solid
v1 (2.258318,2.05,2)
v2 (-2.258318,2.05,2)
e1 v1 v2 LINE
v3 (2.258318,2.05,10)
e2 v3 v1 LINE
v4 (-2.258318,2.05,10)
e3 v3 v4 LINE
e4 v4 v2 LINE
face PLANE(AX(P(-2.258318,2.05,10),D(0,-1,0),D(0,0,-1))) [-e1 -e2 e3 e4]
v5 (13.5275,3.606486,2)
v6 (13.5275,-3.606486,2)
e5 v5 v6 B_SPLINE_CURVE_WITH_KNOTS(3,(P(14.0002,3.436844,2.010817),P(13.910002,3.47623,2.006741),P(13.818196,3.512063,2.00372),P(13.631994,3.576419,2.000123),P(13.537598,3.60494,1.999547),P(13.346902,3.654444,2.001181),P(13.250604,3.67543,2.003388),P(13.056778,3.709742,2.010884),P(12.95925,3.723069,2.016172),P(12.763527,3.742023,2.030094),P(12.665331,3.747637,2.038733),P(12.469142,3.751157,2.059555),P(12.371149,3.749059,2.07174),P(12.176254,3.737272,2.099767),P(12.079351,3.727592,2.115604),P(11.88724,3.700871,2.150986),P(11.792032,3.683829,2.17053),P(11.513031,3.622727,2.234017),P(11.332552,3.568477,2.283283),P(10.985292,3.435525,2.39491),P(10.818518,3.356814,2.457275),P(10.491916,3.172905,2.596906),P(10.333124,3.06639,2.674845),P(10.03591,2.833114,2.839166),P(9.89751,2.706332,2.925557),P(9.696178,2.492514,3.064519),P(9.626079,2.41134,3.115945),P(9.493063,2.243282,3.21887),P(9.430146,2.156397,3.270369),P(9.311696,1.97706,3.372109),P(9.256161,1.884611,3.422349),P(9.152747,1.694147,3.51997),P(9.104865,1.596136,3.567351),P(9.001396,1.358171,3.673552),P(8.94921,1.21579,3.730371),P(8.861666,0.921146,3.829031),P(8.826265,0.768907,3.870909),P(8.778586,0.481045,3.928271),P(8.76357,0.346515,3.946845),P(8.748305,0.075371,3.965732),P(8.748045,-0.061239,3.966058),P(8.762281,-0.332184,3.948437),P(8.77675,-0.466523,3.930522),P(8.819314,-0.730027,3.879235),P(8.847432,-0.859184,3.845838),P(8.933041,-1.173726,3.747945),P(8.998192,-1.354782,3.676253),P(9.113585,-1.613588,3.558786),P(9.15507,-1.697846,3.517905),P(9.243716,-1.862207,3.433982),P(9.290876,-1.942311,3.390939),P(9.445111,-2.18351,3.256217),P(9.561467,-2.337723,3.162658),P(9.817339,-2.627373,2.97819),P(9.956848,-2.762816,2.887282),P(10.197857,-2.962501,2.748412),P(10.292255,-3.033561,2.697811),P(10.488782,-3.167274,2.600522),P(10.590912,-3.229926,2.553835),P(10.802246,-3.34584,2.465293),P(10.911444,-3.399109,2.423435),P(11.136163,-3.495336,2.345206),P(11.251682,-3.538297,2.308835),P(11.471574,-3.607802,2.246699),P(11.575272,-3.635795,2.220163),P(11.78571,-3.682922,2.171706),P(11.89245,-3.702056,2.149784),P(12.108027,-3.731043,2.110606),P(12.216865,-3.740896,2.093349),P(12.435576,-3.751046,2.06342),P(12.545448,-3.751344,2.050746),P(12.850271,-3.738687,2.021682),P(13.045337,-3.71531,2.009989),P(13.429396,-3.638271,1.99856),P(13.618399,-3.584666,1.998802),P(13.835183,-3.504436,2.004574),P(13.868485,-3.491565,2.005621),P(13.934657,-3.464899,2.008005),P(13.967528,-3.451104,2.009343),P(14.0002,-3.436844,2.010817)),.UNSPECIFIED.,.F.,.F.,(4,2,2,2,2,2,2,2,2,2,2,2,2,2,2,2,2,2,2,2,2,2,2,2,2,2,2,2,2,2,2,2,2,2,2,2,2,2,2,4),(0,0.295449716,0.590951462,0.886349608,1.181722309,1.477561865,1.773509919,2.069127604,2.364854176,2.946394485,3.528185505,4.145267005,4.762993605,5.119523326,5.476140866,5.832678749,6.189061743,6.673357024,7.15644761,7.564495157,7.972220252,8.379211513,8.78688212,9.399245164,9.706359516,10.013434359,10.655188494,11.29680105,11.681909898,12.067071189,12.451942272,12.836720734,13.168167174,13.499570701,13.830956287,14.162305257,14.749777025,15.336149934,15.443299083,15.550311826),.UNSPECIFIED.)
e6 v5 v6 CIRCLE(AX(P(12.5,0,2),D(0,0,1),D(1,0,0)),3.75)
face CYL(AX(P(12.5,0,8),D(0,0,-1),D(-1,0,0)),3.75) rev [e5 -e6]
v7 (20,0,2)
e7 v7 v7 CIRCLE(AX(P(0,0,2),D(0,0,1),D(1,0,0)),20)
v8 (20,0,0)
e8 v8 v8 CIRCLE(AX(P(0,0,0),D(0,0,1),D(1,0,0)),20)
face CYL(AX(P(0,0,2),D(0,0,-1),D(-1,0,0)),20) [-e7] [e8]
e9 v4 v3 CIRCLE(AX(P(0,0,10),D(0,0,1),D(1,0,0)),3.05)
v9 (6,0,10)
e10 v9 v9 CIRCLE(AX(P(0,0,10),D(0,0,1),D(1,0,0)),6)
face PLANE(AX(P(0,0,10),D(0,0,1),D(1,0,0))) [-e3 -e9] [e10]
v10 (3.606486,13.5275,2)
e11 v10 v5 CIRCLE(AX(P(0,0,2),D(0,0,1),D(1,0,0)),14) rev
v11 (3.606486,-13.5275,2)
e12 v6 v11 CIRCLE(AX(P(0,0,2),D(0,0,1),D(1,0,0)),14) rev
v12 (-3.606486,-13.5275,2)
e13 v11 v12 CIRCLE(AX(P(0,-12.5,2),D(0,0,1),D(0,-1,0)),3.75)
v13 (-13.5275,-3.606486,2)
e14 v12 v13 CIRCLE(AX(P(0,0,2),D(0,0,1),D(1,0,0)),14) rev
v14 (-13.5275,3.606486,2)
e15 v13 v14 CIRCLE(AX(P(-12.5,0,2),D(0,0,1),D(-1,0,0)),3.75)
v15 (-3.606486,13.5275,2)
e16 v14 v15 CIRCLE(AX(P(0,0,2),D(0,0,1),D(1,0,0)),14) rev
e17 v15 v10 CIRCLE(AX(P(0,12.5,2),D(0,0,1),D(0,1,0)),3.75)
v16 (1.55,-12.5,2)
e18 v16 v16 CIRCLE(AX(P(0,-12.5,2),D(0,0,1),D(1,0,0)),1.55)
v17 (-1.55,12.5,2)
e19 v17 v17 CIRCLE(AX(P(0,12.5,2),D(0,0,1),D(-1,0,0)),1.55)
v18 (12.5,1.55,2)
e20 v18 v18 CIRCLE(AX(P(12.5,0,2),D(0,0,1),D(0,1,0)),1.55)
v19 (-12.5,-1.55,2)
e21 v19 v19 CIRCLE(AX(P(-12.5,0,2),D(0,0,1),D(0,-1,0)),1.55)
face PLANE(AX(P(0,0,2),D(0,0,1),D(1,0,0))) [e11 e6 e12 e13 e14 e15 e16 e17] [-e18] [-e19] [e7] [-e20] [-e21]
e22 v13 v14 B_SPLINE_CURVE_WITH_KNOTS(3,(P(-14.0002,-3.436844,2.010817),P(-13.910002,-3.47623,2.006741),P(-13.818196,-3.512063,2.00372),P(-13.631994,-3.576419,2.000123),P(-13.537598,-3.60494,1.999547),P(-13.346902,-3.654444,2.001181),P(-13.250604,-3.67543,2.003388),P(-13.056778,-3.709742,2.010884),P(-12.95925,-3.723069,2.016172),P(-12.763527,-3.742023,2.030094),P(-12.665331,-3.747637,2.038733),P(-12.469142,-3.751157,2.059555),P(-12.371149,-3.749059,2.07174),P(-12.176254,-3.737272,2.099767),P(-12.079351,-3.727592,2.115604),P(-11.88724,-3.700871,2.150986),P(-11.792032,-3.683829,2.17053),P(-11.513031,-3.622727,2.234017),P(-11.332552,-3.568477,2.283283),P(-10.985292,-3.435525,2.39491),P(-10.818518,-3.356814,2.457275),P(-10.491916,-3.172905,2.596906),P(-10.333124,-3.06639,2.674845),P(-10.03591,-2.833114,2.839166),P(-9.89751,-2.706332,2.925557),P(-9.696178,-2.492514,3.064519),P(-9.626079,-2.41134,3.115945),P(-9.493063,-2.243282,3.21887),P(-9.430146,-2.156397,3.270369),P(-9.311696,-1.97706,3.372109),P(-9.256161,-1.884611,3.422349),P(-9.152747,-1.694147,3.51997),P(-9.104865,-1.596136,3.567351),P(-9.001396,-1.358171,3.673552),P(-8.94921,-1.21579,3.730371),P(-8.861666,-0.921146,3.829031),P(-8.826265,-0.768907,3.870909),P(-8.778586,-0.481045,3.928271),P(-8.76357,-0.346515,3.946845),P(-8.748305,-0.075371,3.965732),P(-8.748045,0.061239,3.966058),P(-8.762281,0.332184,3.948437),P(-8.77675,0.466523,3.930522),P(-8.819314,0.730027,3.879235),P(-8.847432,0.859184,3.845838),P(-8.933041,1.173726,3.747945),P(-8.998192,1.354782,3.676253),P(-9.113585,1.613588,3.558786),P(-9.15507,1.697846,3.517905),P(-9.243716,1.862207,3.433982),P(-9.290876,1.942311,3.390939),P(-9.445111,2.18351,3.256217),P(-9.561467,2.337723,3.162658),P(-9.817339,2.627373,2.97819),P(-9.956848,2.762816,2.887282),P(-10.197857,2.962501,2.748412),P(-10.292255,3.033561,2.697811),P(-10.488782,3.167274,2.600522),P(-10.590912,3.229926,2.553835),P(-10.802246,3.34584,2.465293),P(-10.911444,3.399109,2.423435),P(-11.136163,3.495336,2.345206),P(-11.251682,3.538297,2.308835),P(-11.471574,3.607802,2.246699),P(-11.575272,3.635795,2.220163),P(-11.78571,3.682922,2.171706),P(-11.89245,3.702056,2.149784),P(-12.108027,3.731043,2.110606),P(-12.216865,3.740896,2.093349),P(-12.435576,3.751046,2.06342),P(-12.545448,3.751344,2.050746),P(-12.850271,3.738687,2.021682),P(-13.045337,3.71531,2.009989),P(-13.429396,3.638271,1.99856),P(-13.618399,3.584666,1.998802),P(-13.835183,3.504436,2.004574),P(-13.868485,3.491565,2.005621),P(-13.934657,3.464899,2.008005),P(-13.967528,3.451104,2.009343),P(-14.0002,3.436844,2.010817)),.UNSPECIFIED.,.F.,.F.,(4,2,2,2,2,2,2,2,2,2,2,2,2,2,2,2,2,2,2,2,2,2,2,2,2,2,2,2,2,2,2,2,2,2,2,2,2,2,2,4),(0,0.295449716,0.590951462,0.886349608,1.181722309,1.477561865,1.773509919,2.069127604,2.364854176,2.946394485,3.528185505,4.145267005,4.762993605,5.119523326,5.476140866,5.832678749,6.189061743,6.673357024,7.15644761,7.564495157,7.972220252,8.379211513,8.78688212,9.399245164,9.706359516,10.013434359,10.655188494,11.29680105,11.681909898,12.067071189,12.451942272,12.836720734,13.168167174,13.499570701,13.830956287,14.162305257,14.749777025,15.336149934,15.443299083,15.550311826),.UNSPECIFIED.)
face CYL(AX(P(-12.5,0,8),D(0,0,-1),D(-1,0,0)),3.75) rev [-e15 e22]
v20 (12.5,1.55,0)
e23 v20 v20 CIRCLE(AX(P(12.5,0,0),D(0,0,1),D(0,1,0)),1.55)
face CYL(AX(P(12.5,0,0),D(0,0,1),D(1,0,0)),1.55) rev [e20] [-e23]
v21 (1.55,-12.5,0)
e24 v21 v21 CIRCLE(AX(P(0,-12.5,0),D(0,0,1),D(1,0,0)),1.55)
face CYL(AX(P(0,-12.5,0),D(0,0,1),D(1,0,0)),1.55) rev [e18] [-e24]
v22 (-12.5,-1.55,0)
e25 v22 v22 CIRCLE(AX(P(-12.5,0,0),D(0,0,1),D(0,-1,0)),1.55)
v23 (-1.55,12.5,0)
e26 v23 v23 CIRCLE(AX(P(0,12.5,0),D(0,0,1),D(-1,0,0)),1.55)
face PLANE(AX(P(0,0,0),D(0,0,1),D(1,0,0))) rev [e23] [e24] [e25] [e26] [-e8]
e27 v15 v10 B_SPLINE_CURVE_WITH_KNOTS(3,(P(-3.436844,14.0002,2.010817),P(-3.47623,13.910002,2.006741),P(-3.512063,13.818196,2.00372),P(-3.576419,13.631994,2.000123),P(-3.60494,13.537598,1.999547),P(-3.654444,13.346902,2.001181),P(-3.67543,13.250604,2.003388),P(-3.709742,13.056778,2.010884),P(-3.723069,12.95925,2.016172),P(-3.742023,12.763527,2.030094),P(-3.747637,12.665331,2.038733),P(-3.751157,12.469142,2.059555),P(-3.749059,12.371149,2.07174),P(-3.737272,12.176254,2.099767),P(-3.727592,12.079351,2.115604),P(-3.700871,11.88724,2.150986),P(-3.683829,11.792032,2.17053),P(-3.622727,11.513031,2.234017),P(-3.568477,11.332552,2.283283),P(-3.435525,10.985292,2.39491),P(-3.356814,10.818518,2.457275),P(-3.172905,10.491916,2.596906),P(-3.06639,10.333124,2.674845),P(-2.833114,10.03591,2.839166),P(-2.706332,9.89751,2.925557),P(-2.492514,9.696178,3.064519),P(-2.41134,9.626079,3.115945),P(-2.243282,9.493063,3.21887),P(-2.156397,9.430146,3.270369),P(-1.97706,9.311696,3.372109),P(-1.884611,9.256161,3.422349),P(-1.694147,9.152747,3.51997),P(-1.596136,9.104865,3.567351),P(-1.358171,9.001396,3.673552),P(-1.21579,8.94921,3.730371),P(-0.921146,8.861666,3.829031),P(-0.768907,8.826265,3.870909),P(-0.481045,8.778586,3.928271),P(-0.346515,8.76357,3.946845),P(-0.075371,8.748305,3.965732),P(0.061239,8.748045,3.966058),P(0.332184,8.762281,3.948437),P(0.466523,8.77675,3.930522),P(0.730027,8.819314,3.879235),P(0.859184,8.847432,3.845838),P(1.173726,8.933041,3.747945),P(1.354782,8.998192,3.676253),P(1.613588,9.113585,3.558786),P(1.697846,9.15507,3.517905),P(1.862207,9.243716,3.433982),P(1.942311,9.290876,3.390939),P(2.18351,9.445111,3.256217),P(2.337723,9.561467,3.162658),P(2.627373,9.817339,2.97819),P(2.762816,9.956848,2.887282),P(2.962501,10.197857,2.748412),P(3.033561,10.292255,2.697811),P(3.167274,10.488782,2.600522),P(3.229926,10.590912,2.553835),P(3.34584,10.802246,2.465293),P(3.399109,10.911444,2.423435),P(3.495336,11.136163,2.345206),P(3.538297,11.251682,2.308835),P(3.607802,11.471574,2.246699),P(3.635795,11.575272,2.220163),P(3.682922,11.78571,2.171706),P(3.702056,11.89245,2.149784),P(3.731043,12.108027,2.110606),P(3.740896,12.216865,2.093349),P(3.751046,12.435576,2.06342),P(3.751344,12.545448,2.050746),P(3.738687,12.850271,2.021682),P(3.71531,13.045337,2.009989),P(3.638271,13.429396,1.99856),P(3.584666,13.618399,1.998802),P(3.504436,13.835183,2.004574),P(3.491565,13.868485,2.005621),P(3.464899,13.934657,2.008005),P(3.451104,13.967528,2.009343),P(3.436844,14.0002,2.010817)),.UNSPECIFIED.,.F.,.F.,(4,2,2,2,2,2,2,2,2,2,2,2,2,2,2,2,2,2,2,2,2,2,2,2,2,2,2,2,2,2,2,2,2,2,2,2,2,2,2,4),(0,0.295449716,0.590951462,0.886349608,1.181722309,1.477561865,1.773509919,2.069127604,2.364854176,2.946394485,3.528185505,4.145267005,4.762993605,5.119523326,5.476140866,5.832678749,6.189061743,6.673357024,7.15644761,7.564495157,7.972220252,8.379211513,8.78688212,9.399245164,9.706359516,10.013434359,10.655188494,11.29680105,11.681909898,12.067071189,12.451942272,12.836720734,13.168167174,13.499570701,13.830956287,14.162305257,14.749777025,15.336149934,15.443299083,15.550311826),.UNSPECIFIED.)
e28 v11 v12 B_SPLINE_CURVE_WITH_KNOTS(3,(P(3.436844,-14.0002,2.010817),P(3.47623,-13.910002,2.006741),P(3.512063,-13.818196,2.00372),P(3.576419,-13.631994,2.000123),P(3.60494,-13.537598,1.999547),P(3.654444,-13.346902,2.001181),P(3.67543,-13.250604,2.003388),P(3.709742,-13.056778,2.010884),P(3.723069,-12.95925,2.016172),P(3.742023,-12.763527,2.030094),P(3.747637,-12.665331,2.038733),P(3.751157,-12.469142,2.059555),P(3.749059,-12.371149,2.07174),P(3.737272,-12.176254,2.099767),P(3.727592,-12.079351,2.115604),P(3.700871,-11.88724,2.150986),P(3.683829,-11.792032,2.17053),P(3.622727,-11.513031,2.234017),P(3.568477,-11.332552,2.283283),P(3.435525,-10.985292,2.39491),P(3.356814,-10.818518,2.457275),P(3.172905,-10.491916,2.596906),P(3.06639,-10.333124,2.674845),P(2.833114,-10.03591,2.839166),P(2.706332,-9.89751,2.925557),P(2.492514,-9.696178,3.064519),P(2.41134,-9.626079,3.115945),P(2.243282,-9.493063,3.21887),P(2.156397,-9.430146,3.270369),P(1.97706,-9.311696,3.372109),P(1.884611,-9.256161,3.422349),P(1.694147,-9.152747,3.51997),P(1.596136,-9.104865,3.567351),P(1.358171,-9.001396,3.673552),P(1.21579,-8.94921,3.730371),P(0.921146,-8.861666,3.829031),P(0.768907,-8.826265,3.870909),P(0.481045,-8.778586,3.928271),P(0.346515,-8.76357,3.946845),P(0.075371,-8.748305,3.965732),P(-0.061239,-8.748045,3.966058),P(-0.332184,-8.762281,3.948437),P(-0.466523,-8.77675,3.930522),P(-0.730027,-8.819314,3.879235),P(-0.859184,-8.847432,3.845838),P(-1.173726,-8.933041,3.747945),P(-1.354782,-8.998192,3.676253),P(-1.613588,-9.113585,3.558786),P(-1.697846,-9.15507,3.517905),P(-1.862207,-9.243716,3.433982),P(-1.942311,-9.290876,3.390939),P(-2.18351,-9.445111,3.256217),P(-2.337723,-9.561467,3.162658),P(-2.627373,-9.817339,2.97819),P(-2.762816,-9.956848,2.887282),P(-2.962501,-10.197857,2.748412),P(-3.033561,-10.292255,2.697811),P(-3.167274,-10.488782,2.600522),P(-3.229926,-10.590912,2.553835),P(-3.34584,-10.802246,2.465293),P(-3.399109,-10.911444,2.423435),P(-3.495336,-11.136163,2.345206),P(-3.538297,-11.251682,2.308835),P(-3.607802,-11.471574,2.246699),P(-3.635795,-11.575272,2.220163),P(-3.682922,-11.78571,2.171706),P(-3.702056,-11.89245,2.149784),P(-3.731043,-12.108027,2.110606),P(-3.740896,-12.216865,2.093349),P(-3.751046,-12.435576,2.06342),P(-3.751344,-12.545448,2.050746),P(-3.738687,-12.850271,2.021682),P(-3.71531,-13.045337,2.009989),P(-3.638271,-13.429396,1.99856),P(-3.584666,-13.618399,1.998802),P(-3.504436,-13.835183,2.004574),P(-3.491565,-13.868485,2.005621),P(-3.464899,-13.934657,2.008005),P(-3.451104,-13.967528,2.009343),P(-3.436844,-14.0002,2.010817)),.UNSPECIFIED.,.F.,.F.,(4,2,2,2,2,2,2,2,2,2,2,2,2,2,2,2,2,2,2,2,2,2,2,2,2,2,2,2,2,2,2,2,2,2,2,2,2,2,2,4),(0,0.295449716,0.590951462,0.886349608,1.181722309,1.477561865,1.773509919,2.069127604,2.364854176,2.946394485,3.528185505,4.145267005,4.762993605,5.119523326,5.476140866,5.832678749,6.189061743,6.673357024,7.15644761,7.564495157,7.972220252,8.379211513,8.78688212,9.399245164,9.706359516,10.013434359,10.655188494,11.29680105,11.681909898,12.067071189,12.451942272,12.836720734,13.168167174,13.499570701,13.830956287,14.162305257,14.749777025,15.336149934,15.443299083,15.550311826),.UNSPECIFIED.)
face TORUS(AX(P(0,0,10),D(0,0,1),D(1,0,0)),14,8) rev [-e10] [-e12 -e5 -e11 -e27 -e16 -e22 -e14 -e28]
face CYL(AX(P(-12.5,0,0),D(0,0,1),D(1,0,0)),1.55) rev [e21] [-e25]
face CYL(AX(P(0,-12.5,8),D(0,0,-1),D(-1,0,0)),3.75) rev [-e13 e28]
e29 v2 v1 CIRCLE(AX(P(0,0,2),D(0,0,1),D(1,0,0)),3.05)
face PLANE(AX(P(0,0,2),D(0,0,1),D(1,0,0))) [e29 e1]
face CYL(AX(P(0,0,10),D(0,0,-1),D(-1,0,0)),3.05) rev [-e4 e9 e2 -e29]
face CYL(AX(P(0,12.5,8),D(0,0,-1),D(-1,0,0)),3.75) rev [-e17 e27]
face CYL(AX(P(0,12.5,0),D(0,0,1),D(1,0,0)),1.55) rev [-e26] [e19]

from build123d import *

# Parameters (mm, degrees)
ESBO_O1_R                = 20
RESSALTO_EXTRUS_O1_DEPTH = 2
ESBO_O2_R                = 6
RESSALTO_EXTRUS_O2_DEPTH = 8
FILETE3_R                = 8
ESBO_O3_R                = 1.55
CORTE_EXTRUS_O1_DEPTH    = 30.393876913
PADR_OCIRCULAR1_COUNT    = 4
ESBO_O5_R                = 3.75
CORTE_EXTRUS_O2_DEPTH    = 6
PADR_OCIRCULAR2_COUNT    = 4


with BuildPart() as part:
    # Esboço1 → Ressalto-extrusão1 (new body)
    with BuildSketch(Plane.XY):
        Circle(ESBO_O1_R)
    extrude(amount=RESSALTO_EXTRUS_O1_DEPTH)

    # Esboço2 → Ressalto-extrusão2 (add)
    with BuildSketch(Plane.XY.offset(2)):
        Circle(ESBO_O2_R)
        with BuildLine():
            Line((-2.258317958, 2.05), (2.258317958, 2.05))
            ThreePointArc((2.258317958, 2.05), (0, -3.05), (-2.258317958, 2.05))
        make_face(mode=Mode.SUBTRACT)
    extrude(amount=RESSALTO_EXTRUS_O2_DEPTH)

    # Filete3
    filete3_edges = [part.edges().sort_by_distance(p)[0] for p in [
        (-6, 0, 2),
    ]]
    fillet(filete3_edges, radius=FILETE3_R - 0.0001)  # a hair under: the kernel refuses the full size

    # Esboço3 → Corte-extrusão1 (cut, through all)
    with BuildSketch(Plane.XY.offset(2)):
        with Locations((0, -12.5)):
            Circle(ESBO_O3_R)
    corte_extrus_o1 = extrude(amount=-CORTE_EXTRUS_O1_DEPTH, mode=Mode.SUBTRACT)

    # PadrãoCircular1: Corte-extrusão1 ×4 about axis
    padr_ocircular1_axis = Axis((0, 0, 0), (0, 0, 1))
    for i in range(1, PADR_OCIRCULAR1_COUNT):
        add(corte_extrus_o1.rotate(padr_ocircular1_axis, i * 360 / PADR_OCIRCULAR1_COUNT), mode=Mode.SUBTRACT)

    # Esboço5 → Corte-extrusão2 (cut)
    with BuildSketch(Plane.XY.offset(2)):
        with Locations((12.5, 0)):
            Circle(ESBO_O5_R)
    corte_extrus_o2 = extrude(amount=CORTE_EXTRUS_O2_DEPTH, mode=Mode.SUBTRACT)

    # PadrãoCircular2: Corte-extrusão2 ×4 about axis
    padr_ocircular2_axis = Axis((0, 0, 0), (0, 0, 1))
    for i in range(1, PADR_OCIRCULAR2_COUNT):
        add(corte_extrus_o2.rotate(padr_ocircular2_axis, i * 360 / PADR_OCIRCULAR2_COUNT), mode=Mode.SUBTRACT)


solid = part.part
